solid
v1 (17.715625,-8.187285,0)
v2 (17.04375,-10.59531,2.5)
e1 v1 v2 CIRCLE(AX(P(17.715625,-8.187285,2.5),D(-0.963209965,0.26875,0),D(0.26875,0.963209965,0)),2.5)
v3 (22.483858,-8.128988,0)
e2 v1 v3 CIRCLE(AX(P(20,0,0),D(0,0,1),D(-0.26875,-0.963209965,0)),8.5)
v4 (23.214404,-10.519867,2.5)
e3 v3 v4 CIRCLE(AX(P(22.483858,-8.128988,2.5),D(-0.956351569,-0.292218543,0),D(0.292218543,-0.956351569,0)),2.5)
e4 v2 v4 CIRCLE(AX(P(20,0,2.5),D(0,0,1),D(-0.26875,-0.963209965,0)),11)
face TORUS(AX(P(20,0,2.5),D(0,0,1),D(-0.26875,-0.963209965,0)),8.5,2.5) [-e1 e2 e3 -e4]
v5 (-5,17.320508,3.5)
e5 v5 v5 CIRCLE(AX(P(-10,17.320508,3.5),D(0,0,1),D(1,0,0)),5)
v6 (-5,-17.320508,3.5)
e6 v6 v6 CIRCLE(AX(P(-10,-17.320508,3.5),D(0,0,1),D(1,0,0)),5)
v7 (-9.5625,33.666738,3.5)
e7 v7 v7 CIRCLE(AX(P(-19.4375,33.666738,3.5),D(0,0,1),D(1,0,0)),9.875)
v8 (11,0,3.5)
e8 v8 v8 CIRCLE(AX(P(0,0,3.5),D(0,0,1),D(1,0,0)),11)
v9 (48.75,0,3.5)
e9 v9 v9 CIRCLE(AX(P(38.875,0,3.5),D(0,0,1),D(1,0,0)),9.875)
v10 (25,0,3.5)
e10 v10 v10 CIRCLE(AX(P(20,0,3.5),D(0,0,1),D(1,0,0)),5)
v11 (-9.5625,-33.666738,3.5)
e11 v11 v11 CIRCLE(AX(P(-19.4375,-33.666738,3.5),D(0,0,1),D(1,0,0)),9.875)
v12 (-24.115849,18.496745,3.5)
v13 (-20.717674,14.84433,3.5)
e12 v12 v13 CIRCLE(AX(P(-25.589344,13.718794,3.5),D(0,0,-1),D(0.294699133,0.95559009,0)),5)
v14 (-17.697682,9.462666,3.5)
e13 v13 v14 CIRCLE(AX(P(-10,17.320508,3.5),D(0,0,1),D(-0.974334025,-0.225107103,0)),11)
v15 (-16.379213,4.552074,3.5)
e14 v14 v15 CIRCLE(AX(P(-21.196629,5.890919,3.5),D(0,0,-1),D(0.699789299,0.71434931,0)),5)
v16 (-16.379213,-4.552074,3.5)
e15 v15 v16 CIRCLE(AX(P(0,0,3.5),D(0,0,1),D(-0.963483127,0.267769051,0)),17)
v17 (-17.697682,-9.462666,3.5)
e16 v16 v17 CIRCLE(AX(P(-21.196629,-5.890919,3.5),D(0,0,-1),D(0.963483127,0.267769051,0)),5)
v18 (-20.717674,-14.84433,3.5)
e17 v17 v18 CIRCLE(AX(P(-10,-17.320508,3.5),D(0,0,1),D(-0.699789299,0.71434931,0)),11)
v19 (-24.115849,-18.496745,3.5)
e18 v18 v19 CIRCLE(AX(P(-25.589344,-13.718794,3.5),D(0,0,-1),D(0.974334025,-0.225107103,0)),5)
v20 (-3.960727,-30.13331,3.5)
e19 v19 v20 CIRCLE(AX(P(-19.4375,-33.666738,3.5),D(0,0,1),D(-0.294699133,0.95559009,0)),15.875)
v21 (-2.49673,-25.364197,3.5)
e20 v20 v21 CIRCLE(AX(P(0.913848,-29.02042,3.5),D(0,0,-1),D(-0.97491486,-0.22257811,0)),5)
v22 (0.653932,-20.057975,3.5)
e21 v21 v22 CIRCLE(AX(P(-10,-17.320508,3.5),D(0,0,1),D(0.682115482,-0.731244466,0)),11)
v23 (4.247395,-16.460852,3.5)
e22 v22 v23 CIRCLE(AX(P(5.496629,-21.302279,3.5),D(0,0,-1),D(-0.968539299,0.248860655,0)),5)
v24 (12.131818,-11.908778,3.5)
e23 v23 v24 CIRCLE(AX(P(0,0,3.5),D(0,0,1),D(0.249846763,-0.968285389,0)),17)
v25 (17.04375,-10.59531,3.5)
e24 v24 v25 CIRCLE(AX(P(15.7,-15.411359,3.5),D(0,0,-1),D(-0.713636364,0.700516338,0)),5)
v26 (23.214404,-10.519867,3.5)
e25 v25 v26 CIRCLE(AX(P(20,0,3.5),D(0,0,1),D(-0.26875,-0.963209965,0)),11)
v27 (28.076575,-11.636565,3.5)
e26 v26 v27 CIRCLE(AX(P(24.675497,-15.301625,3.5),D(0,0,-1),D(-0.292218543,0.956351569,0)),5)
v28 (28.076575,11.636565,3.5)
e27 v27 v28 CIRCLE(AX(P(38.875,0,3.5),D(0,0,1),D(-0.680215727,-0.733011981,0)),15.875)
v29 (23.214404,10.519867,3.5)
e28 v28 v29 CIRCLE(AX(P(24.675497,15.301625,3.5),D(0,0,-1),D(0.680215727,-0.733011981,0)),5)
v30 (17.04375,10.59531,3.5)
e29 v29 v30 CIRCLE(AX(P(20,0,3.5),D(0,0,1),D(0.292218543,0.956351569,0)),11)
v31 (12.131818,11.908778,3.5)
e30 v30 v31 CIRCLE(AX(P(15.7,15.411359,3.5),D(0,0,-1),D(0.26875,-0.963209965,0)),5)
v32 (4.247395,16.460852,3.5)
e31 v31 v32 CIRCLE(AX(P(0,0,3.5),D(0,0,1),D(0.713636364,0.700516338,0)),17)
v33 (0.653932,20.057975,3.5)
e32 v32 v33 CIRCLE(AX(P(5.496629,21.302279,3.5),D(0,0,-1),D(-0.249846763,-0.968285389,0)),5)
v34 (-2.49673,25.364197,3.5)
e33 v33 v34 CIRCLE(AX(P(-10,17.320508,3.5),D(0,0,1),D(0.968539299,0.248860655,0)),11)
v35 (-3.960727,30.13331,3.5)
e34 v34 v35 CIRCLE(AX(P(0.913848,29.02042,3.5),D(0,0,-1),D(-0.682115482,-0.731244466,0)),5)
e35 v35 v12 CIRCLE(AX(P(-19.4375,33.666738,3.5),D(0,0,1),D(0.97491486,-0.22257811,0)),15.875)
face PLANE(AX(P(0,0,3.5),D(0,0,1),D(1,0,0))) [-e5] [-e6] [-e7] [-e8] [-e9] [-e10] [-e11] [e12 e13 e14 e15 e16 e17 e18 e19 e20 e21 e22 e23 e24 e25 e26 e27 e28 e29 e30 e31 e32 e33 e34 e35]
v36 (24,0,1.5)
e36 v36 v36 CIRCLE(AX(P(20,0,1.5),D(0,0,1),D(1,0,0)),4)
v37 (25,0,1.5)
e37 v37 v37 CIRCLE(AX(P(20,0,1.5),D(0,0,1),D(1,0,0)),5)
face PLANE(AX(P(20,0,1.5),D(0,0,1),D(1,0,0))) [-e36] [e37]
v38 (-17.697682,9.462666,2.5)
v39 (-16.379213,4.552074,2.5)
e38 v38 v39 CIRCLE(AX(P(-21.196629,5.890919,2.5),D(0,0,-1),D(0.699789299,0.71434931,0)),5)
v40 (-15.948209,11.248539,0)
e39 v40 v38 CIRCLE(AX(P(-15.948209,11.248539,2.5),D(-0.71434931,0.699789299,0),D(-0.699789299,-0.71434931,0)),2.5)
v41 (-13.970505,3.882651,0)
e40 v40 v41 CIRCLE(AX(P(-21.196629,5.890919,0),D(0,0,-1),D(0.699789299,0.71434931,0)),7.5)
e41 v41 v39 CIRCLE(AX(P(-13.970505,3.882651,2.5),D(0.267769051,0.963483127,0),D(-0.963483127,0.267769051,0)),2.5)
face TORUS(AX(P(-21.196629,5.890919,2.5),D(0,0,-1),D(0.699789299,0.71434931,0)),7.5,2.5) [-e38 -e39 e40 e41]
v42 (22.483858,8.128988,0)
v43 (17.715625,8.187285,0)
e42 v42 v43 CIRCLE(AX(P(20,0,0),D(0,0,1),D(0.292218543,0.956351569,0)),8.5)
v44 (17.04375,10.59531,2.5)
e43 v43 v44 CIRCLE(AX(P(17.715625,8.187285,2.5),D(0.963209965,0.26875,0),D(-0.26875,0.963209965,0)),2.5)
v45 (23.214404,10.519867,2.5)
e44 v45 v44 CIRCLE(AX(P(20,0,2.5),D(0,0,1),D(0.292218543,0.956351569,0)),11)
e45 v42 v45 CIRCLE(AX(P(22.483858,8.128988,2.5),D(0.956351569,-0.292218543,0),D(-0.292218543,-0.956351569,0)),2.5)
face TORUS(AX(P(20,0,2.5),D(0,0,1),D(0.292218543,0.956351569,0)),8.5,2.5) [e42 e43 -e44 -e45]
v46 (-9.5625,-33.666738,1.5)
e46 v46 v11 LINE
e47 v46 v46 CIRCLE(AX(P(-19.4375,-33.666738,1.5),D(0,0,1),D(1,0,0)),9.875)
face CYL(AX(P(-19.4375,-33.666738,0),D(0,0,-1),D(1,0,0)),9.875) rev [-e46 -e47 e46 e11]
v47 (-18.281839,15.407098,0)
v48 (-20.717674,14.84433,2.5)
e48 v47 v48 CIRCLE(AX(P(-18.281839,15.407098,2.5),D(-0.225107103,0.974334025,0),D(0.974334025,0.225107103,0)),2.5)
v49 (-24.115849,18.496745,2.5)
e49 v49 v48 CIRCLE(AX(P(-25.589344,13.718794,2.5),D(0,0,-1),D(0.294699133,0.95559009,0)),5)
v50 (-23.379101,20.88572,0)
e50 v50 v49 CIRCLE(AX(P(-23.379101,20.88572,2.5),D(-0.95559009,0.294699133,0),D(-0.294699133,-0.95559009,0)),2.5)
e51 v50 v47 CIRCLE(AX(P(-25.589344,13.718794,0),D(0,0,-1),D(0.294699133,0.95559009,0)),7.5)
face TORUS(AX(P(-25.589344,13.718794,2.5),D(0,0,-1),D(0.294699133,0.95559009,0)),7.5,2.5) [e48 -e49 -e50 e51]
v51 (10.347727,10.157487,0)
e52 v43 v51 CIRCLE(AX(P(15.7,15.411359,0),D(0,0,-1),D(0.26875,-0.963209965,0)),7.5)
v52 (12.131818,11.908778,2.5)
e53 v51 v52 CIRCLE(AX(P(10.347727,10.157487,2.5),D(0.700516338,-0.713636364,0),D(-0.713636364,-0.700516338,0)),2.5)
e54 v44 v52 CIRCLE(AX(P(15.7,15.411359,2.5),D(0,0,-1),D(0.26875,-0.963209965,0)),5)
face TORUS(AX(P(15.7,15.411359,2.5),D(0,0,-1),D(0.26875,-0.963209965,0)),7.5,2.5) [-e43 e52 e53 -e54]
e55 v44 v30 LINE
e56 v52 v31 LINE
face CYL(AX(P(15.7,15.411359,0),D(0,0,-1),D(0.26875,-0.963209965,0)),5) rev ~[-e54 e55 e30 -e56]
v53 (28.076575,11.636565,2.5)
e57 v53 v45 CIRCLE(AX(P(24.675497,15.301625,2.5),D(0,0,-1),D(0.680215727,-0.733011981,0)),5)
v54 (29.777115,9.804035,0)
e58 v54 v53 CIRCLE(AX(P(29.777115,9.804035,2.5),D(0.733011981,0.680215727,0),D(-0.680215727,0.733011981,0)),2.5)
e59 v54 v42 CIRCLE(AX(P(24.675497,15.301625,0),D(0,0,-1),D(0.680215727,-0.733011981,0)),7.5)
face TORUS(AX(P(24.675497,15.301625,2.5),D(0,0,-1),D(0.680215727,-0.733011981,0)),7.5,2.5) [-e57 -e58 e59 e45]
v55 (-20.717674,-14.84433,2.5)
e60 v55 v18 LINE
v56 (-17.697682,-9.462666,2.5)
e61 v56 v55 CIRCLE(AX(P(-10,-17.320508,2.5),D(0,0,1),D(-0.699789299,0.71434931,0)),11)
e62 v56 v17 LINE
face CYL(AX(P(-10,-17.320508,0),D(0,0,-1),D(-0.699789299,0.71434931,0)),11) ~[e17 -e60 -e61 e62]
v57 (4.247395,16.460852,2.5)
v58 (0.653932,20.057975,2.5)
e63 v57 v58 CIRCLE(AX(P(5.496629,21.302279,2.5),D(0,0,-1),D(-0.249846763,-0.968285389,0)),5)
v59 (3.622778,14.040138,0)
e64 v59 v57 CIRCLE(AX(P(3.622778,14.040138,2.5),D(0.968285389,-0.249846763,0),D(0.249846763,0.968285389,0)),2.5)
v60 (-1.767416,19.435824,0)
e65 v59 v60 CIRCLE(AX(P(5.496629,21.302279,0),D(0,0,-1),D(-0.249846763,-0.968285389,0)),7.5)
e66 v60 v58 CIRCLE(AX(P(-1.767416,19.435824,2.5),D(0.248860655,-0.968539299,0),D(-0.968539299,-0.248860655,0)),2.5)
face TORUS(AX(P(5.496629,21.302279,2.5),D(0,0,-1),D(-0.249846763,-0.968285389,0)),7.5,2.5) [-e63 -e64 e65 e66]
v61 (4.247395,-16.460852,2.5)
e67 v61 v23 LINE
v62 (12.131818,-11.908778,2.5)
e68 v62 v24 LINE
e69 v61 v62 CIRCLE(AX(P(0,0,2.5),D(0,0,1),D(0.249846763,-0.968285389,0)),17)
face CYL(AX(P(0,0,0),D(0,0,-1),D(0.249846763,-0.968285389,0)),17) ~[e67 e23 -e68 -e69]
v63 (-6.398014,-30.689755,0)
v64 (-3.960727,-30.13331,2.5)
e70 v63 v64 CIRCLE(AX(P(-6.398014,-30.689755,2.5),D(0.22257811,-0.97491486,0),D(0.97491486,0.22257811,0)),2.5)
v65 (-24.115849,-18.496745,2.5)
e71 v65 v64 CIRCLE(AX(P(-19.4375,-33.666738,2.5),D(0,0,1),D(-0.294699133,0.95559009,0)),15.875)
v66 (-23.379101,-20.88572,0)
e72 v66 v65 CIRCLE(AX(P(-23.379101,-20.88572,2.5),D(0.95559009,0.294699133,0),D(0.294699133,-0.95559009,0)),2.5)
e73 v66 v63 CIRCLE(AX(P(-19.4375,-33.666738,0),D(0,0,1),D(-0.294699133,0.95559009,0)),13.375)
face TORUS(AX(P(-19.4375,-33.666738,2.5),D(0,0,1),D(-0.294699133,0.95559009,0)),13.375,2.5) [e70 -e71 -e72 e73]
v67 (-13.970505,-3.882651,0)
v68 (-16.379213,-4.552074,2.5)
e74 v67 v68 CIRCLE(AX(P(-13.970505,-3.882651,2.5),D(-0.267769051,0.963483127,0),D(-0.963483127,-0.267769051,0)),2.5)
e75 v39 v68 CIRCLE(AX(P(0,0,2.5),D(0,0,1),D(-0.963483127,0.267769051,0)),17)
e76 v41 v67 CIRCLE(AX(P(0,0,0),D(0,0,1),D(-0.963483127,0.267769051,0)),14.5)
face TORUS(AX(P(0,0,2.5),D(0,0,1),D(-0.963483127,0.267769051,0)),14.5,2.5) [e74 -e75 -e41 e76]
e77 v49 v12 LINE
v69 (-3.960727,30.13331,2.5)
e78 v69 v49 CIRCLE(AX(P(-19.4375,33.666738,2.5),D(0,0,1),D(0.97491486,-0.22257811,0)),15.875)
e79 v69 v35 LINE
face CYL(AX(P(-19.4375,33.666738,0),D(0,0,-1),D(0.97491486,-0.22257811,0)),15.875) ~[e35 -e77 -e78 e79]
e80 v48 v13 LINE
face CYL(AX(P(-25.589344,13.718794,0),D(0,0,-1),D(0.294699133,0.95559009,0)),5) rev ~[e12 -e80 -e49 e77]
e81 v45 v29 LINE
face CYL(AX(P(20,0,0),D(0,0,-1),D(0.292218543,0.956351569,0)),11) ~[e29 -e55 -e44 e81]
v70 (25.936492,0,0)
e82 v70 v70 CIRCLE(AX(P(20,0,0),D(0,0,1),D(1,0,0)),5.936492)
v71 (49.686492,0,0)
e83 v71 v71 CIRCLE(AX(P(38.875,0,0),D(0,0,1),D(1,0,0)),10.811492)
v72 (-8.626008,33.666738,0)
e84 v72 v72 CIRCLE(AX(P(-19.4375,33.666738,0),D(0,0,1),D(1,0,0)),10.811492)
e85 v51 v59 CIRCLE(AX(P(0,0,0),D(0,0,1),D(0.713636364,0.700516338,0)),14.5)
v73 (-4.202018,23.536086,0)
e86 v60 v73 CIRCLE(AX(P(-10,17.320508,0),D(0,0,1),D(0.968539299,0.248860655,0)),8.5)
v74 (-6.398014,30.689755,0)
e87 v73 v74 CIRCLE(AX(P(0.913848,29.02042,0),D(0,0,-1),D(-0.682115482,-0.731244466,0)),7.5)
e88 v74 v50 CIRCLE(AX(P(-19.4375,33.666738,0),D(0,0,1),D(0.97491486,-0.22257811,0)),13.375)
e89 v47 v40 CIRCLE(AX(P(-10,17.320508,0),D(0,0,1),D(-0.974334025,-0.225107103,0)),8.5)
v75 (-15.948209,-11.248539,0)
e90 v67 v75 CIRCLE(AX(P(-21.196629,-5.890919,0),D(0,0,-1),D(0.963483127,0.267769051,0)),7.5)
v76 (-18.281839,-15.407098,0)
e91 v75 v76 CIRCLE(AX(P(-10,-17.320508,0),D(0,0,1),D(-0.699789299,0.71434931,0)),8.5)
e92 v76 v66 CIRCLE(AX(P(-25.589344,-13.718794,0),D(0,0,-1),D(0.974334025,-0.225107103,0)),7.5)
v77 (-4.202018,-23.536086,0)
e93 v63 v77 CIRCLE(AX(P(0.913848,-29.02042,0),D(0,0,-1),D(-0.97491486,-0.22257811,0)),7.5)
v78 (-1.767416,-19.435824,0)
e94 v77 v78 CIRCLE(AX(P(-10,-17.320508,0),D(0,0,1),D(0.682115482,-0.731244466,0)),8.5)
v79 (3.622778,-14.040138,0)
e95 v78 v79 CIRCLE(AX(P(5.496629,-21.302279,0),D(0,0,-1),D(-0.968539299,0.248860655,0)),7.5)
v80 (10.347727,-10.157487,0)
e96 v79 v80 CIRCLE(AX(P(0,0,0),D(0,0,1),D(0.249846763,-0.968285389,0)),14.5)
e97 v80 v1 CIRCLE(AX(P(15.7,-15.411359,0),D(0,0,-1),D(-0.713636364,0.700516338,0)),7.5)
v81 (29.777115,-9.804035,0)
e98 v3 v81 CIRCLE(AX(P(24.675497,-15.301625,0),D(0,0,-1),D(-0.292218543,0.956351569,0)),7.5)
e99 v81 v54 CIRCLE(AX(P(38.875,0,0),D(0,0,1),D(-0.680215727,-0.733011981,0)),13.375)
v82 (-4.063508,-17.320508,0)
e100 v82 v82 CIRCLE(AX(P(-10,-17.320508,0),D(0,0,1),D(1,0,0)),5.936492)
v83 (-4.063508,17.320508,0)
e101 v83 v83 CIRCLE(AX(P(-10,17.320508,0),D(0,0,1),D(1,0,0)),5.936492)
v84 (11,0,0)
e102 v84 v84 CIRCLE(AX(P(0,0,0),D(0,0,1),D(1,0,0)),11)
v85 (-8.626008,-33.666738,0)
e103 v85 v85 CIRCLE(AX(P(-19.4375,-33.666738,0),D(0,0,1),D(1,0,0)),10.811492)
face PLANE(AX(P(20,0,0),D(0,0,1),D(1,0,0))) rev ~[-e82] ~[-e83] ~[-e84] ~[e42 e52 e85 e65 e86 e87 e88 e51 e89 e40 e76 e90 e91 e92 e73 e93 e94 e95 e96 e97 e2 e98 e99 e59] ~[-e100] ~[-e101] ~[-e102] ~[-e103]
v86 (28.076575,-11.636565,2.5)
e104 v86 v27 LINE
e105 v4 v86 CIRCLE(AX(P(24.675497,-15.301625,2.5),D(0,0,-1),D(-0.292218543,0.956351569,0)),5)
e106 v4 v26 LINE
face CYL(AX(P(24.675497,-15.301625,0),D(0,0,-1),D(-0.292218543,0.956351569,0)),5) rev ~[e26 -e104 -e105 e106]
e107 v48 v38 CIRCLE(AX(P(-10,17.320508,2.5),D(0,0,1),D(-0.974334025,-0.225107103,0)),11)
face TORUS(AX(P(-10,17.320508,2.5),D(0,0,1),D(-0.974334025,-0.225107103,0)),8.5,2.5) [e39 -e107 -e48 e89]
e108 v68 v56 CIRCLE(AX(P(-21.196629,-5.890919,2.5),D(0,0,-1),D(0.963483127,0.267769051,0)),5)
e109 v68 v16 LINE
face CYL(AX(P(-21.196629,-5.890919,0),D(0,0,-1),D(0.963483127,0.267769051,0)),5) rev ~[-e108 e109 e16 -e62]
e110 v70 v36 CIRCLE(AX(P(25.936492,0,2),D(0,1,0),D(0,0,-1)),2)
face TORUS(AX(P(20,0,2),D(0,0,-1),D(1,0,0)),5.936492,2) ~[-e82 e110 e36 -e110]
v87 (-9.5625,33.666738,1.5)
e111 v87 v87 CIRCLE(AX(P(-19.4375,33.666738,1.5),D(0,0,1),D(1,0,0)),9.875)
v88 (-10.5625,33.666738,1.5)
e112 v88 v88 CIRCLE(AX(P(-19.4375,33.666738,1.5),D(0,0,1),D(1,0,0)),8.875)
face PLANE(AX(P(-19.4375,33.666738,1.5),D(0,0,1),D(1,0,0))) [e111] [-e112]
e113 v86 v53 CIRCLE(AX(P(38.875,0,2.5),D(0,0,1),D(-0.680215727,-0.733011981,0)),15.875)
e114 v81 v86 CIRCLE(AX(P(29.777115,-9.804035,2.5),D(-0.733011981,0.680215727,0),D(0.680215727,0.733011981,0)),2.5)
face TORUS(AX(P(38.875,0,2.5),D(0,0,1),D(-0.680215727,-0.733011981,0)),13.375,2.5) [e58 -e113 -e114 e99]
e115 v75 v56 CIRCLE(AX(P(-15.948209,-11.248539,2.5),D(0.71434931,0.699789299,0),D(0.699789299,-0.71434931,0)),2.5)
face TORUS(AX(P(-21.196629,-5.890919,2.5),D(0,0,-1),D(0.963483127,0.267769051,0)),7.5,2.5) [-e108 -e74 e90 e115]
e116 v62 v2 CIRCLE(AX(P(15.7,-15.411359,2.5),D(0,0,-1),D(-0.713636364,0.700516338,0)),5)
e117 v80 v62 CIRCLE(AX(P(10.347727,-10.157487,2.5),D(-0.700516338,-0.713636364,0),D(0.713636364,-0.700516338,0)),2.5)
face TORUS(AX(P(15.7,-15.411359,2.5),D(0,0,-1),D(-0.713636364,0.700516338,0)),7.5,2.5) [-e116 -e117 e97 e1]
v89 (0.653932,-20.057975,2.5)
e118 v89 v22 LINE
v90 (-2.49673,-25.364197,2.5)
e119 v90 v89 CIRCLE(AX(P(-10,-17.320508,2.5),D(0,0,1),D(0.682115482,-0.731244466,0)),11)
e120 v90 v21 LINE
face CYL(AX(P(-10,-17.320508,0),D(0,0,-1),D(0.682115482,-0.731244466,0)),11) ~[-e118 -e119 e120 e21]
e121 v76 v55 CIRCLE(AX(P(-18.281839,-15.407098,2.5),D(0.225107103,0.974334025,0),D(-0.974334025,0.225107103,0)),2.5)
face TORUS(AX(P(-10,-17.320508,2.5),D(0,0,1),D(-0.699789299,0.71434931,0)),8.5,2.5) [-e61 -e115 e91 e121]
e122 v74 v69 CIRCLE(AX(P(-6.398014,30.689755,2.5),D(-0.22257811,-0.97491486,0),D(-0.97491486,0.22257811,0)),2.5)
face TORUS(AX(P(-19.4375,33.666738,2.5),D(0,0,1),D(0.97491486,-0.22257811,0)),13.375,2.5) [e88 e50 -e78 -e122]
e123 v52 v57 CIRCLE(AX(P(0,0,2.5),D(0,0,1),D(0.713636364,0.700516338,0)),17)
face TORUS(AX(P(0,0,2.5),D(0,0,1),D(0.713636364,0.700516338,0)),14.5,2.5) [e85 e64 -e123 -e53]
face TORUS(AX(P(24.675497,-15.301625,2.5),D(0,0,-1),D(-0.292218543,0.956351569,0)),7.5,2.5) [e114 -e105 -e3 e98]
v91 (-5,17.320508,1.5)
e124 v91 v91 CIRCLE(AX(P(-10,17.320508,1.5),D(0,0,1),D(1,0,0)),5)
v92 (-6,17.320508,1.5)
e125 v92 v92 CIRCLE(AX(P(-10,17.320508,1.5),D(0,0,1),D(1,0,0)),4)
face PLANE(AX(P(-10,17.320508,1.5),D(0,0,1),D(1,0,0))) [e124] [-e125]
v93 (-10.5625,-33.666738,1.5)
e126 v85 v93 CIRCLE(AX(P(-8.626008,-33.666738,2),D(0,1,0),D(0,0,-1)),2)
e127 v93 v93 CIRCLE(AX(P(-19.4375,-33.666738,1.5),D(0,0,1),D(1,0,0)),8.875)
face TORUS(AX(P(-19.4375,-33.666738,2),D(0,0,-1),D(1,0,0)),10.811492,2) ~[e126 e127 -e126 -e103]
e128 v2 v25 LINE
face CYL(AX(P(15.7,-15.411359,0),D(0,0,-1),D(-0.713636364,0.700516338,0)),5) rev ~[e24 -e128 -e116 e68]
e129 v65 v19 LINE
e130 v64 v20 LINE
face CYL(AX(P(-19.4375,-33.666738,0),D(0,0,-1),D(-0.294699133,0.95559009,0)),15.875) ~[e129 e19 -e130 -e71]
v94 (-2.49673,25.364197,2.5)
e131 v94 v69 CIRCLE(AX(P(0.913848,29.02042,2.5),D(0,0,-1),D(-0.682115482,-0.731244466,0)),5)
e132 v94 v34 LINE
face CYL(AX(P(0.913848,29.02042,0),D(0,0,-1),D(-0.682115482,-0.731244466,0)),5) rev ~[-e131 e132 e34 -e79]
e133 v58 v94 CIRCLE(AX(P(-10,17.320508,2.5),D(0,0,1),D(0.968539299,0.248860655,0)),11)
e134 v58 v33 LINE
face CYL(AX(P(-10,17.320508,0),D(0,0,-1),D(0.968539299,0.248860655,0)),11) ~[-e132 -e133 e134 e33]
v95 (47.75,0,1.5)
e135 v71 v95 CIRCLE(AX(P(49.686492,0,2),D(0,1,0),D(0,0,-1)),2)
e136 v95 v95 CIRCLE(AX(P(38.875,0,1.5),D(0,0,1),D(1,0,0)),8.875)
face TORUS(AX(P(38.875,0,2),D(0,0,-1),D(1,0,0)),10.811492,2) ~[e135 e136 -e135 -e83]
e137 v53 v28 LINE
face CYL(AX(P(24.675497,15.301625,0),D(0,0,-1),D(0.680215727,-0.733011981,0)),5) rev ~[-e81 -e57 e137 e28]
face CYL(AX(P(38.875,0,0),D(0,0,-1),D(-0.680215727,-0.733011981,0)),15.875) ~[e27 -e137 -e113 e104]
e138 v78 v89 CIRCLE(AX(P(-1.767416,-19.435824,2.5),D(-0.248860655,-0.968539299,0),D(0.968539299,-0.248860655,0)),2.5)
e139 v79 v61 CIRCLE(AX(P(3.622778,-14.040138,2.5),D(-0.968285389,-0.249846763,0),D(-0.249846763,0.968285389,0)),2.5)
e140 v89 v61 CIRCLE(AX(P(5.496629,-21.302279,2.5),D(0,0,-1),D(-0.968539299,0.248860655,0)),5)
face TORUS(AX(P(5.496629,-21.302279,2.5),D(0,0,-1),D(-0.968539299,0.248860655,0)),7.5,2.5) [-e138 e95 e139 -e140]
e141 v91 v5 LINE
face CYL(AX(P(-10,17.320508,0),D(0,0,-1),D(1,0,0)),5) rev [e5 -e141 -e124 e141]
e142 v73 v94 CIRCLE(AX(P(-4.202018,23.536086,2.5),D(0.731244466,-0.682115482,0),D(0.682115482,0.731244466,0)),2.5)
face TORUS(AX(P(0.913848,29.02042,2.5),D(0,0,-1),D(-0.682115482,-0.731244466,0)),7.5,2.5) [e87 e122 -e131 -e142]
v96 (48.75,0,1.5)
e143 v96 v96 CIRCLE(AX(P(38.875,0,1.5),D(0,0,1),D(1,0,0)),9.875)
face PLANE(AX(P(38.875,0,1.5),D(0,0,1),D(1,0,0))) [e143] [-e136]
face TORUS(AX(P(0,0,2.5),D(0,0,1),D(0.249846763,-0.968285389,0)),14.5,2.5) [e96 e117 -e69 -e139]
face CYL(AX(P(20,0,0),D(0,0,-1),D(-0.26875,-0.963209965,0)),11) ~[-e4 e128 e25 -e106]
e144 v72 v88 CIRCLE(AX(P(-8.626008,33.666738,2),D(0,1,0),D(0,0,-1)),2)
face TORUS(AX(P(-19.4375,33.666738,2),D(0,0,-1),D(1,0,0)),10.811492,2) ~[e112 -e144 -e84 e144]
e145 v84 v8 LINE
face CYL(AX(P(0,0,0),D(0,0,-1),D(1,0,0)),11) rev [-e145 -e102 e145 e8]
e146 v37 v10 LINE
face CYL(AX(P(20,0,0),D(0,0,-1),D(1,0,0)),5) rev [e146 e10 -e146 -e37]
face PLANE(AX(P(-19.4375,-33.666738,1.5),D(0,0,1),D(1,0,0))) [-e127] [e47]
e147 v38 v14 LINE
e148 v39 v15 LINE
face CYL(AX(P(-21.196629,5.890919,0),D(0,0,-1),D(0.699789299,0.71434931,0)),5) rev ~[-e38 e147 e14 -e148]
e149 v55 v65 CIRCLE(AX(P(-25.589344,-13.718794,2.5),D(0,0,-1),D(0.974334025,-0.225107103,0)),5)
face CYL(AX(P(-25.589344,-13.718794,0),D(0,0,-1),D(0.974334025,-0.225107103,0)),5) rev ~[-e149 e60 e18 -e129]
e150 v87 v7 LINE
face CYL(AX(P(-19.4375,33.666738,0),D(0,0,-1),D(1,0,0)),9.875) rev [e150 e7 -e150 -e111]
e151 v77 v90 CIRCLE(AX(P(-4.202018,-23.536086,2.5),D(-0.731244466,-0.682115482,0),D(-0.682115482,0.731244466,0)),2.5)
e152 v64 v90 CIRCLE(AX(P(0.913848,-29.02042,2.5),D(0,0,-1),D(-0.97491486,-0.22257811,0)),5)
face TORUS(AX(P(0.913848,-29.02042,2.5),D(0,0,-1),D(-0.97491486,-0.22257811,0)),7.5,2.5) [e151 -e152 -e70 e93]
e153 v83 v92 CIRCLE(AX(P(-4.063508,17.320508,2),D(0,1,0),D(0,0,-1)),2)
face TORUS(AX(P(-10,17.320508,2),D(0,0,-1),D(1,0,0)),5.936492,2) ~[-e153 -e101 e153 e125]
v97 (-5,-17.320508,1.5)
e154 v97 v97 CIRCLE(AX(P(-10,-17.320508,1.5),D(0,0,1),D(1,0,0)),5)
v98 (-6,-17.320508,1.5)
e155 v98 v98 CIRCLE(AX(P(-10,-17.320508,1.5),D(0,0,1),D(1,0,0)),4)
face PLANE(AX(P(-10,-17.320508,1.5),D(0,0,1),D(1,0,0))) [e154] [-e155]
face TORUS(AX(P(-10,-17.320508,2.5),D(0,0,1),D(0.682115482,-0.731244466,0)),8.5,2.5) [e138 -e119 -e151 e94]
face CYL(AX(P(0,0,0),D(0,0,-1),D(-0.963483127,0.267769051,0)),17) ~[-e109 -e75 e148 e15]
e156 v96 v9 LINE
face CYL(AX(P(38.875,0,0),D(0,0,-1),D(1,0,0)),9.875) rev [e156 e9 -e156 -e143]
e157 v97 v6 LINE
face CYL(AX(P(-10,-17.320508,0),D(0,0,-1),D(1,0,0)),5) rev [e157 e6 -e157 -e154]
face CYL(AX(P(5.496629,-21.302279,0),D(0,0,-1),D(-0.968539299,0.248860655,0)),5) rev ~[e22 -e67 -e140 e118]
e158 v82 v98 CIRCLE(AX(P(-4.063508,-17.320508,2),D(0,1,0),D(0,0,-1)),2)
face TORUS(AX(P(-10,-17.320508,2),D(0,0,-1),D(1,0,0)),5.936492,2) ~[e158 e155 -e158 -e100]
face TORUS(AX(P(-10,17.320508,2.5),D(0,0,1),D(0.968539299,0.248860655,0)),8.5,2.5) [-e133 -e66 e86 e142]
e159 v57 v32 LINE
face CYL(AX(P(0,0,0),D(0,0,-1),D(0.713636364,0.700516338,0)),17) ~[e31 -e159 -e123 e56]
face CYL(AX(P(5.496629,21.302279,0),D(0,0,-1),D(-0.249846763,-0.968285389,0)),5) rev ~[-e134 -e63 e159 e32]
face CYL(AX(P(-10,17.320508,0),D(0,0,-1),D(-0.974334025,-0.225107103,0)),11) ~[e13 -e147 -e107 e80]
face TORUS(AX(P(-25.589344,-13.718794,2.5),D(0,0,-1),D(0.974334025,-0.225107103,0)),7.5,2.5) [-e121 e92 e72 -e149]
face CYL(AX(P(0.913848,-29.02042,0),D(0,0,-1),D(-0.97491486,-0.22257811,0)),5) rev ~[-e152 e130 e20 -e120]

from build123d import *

# Parameters (mm, degrees)
F0_R     = 9.875
F0_R_2   = 5
F0_R_3   = 11
F1_DEPTH = 3.5
F0_R_4   = 8.875
F2_DEPTH = 1.5
F0_R_5   = 4
F3_DEPTH = 1.5
F4_R     = 2.5


# Not quite as in the source:
# - a fillet or chamfer that OpenCascade refuses, or shapes differently, is made with other operations: its cross-section is extruded or revolved along the edge and cut away or added


with BuildPart() as f1:
    # F0 (on Top) → F1 (new body)
    with BuildSketch(Plane.XY):
        with BuildLine():
            ThreePointArc((12.1318181818, -11.9087777544), (14.4083638811, -10.5810720707), (17.04375, -10.5953096197))
            ThreePointArc((17.04375, -10.5953096197), (20.1344758568, -10.9991779804), (23.2144039735, -10.5198672565))
            ThreePointArc((23.2144039735, -10.5198672565), (25.7947106614, -10.4284987853), (28.0765753262, -11.6365651961))
            ThreePointArc((28.0765753262, -11.6365651961), (54.75, 0), (28.0765753262, 11.6365651961))
            ThreePointArc((28.0765753262, 11.6365651961), (25.7947106614, 10.4284987853), (23.2144039735, 10.5198672565))
            ThreePointArc((23.2144039735, 10.5198672565), (20.1344758568, 10.9991779804), (17.04375, 10.5953096197))
            ThreePointArc((17.04375, 10.5953096197), (14.4083638811, 10.5810720707), (12.1318181818, 11.9087777544))
            ThreePointArc((12.1318181818, 11.9087777544), (8.5, 14.7224318643), (4.2473949724, 16.4608516167))
            ThreePointArc((4.2473949724, 16.4608516167), (1.9592952719, 17.7685451833), (0.6539322916, 20.0579752856))
            ThreePointArc((0.6539322916, 20.0579752856), (-0.5416703766, 22.936556574), (-2.4967296982, 25.364197203))
            ThreePointArc((-2.4967296982, 25.364197203), (-3.8660104593, 27.5531241087), (-3.9607265904, 30.1333100818))
            ThreePointArc((-3.9607265904, 30.1333100818), (-27.375, 47.4148908572), (-24.1158487357, 18.4967448857))
            ThreePointArc((-24.1158487357, 18.4967448857), (-21.9287002021, 17.1246253234), (-20.7176742754, 14.8443299465))
            ThreePointArc((-20.7176742754, 14.8443299465), (-19.5928054801, 11.9373785936), (-17.6976822916, 9.4626656659))
            ThreePointArc((-17.6976822916, 9.4626656659), (-16.367659153, 7.1874731127), (-16.3792131542, 4.5520738624))
            ThreePointArc((-16.3792131542, 4.5520738624), (-17, 0), (-16.3792131542, -4.5520738624))
            ThreePointArc((-16.3792131542, -4.5520738624), (-16.367659153, -7.1874731127), (-17.6976822916, -9.4626656659))
            ThreePointArc((-17.6976822916, -9.4626656659), (-19.5928054801, -11.9373785936), (-20.7176742754, -14.8443299465))
            ThreePointArc((-20.7176742754, -14.8443299465), (-21.9287002021, -17.1246253234), (-24.1158487357, -18.4967448857))
            ThreePointArc((-24.1158487357, -18.4967448857), (-27.375, -47.4148908572), (-3.9607265904, -30.1333100818))
            ThreePointArc((-3.9607265904, -30.1333100818), (-3.8660104593, -27.5531241087), (-2.4967296982, -25.364197203))
            ThreePointArc((-2.4967296982, -25.364197203), (-0.5416703766, -22.936556574), (0.6539322916, -20.0579752856))
            ThreePointArc((0.6539322916, -20.0579752856), (1.9592952719, -17.7685451833), (4.2473949724, -16.4608516167))
            ThreePointArc((4.2473949724, -16.4608516167), (8.5, -14.7224318643), (12.1318181818, -11.9087777544))
        make_face()
        with Locations((-19.4375, -33.6667375721)):
            Circle(F0_R, mode=Mode.SUBTRACT)
        with Locations((-10, -17.3205080757)):
            Circle(F0_R_2, mode=Mode.SUBTRACT)
        Circle(F0_R_3, mode=Mode.SUBTRACT)
        with Locations((-10, 17.3205080757)):
            Circle(F0_R_2, mode=Mode.SUBTRACT)
        with Locations((-19.4375, 33.6667375721)):
            Circle(F0_R, mode=Mode.SUBTRACT)
        with Locations((20, 0)):
            Circle(F0_R_2, mode=Mode.SUBTRACT)
        with Locations((38.875, 0)):
            Circle(F0_R, mode=Mode.SUBTRACT)
    extrude(amount=F1_DEPTH)

    # F0 (on Top) → F2 (join)
    with BuildSketch(Plane.XY):
        with Locations((-19.4375, 33.6667375721)):
            Circle(F0_R)
        with Locations((-19.4375, 33.6667375721)):
            Circle(F0_R_4, mode=Mode.SUBTRACT)
        with Locations((38.875, 0)):
            Circle(F0_R)
        with Locations((38.875, 0)):
            Circle(F0_R_4, mode=Mode.SUBTRACT)
        with Locations((-19.4375, -33.6667375721)):
            Circle(F0_R)
        with Locations((-19.4375, -33.6667375721)):
            Circle(F0_R_4, mode=Mode.SUBTRACT)
    extrude(amount=F2_DEPTH)

    # F0 (on Top) → F3 (join)
    with BuildSketch(Plane.XY):
        with Locations((20, 0)):
            Circle(F0_R_2)
        with Locations((20, 0)):
            Circle(F0_R_5, mode=Mode.SUBTRACT)
        with Locations((-10, -17.3205080757)):
            Circle(F0_R_2)
        with Locations((-10, -17.3205080757)):
            Circle(F0_R_5, mode=Mode.SUBTRACT)
        with Locations((-10, 17.3205080757)):
            Circle(F0_R_2)
        with Locations((-10, 17.3205080757)):
            Circle(F0_R_5, mode=Mode.SUBTRACT)
    extrude(amount=F3_DEPTH)

    # F4
    f4_edges = [f1.edges().sort_by_distance(p)[0] for p in [
        (-17, 0, 0),
        (-19.592805, 11.937379, 0),
        (-21.9287, 17.124625, 0),
        (-16.367659, 7.187473, 0),
        (-16.367659, -7.187473, 0),
        (-19.592805, -11.937379, 0),
        (-21.9287, -17.124625, 0),
        (-27.375, -47.414891, 0),
        (-3.86601, -27.553124, 0),
        (-0.54167, -22.936557, 0),
        (1.959295, -17.768545, 0),
        (8.5, -14.722432, 0),
        (14.408364, -10.581072, 0),
        (20.134476, -10.999178, 0),
        (25.794711, -10.428499, 0),
        (54.75, 0, 0),
        (25.794711, 10.428499, 0),
        (20.134476, 10.999178, 0),
        (14.408364, 10.581072, 0),
        (8.5, 14.722432, 0),
        (1.959295, 17.768545, 0),
        (-0.54167, 22.936557, 0),
        (-3.86601, 27.553124, 0),
        (-27.375, 47.414891, 0),
    ]]
    fillet(f4_edges, radius=F4_R)

    # F5: fillet of radius 2 on 6 edges, made by hand

    # F5_s1 → F5_t2 (revolve, cut)
    with BuildSketch(Plane.XZ.offset(-33.6667375721)):
        with BuildLine():
            ThreePointArc((-8.6260083269, 0), (-9.8507531983, 0.4188611699), (-10.5625, 1.5))
            Line((-10.5625, 1.5), (-10.5625, 0))
            Line((-10.5625, 0), (-8.6260083269, 0))
        make_face()
    revolve(axis=Axis((-19.4375, 33.6667375721, 0), (0, 0, 1)), mode=Mode.SUBTRACT)

    # F5_s3 → F5_t4 (revolve, cut)
    with BuildSketch(Plane.XZ.offset(-17.3205080757)):
        with BuildLine():
            ThreePointArc((-4.0635083269, 0), (-5.2882531983, 0.4188611699), (-6, 1.5))
            Line((-6, 1.5), (-6, 0))
            Line((-6, 0), (-4.0635083269, 0))
        make_face()
    revolve(axis=Axis((-10, 17.3205080757, 0), (0, 0, 1)), mode=Mode.SUBTRACT)

    # F5_s5 → F5_t6 (revolve, cut)
    with BuildSketch(Plane.XZ):
        with BuildLine():
            ThreePointArc((25.9364916731, 0), (24.7117468017, 0.4188611699), (24, 1.5))
            Line((24, 1.5), (24, 0))
            Line((24, 0), (25.9364916731, 0))
        make_face()
    revolve(axis=Axis((20, 0, 0), (0, 0, 1)), mode=Mode.SUBTRACT)

    # F5_s7 → F5_t8 (revolve, cut)
    with BuildSketch(Plane.XZ):
        with BuildLine():
            ThreePointArc((49.6864916731, 0), (48.4617468017, 0.4188611699), (47.75, 1.5))
            Line((47.75, 1.5), (47.75, 0))
            Line((47.75, 0), (49.6864916731, 0))
        make_face()
    revolve(axis=Axis((38.875, 0, 0), (0, 0, 1)), mode=Mode.SUBTRACT)

    # F5_s9 → F5_t10 (revolve, cut)
    with BuildSketch(Plane.XZ.offset(17.3205080757)):
        with BuildLine():
            ThreePointArc((-4.0635083269, 0), (-5.2882531983, 0.4188611699), (-6, 1.5))
            Line((-6, 1.5), (-6, 0))
            Line((-6, 0), (-4.0635083269, 0))
        make_face()
    revolve(axis=Axis((-10, -17.3205080757, 0), (0, 0, 1)), mode=Mode.SUBTRACT)

    # F5_s11 → F5_t12 (revolve, cut)
    with BuildSketch(Plane.XZ.offset(33.6667375721)):
        with BuildLine():
            ThreePointArc((-8.6260083269, 0), (-9.8507531983, 0.4188611699), (-10.5625, 1.5))
            Line((-10.5625, 1.5), (-10.5625, 0))
            Line((-10.5625, 0), (-8.6260083269, 0))
        make_face()
    revolve(axis=Axis((-19.4375, -33.6667375721, 0), (0, 0, 1)), mode=Mode.SUBTRACT)


solid = f1.part
